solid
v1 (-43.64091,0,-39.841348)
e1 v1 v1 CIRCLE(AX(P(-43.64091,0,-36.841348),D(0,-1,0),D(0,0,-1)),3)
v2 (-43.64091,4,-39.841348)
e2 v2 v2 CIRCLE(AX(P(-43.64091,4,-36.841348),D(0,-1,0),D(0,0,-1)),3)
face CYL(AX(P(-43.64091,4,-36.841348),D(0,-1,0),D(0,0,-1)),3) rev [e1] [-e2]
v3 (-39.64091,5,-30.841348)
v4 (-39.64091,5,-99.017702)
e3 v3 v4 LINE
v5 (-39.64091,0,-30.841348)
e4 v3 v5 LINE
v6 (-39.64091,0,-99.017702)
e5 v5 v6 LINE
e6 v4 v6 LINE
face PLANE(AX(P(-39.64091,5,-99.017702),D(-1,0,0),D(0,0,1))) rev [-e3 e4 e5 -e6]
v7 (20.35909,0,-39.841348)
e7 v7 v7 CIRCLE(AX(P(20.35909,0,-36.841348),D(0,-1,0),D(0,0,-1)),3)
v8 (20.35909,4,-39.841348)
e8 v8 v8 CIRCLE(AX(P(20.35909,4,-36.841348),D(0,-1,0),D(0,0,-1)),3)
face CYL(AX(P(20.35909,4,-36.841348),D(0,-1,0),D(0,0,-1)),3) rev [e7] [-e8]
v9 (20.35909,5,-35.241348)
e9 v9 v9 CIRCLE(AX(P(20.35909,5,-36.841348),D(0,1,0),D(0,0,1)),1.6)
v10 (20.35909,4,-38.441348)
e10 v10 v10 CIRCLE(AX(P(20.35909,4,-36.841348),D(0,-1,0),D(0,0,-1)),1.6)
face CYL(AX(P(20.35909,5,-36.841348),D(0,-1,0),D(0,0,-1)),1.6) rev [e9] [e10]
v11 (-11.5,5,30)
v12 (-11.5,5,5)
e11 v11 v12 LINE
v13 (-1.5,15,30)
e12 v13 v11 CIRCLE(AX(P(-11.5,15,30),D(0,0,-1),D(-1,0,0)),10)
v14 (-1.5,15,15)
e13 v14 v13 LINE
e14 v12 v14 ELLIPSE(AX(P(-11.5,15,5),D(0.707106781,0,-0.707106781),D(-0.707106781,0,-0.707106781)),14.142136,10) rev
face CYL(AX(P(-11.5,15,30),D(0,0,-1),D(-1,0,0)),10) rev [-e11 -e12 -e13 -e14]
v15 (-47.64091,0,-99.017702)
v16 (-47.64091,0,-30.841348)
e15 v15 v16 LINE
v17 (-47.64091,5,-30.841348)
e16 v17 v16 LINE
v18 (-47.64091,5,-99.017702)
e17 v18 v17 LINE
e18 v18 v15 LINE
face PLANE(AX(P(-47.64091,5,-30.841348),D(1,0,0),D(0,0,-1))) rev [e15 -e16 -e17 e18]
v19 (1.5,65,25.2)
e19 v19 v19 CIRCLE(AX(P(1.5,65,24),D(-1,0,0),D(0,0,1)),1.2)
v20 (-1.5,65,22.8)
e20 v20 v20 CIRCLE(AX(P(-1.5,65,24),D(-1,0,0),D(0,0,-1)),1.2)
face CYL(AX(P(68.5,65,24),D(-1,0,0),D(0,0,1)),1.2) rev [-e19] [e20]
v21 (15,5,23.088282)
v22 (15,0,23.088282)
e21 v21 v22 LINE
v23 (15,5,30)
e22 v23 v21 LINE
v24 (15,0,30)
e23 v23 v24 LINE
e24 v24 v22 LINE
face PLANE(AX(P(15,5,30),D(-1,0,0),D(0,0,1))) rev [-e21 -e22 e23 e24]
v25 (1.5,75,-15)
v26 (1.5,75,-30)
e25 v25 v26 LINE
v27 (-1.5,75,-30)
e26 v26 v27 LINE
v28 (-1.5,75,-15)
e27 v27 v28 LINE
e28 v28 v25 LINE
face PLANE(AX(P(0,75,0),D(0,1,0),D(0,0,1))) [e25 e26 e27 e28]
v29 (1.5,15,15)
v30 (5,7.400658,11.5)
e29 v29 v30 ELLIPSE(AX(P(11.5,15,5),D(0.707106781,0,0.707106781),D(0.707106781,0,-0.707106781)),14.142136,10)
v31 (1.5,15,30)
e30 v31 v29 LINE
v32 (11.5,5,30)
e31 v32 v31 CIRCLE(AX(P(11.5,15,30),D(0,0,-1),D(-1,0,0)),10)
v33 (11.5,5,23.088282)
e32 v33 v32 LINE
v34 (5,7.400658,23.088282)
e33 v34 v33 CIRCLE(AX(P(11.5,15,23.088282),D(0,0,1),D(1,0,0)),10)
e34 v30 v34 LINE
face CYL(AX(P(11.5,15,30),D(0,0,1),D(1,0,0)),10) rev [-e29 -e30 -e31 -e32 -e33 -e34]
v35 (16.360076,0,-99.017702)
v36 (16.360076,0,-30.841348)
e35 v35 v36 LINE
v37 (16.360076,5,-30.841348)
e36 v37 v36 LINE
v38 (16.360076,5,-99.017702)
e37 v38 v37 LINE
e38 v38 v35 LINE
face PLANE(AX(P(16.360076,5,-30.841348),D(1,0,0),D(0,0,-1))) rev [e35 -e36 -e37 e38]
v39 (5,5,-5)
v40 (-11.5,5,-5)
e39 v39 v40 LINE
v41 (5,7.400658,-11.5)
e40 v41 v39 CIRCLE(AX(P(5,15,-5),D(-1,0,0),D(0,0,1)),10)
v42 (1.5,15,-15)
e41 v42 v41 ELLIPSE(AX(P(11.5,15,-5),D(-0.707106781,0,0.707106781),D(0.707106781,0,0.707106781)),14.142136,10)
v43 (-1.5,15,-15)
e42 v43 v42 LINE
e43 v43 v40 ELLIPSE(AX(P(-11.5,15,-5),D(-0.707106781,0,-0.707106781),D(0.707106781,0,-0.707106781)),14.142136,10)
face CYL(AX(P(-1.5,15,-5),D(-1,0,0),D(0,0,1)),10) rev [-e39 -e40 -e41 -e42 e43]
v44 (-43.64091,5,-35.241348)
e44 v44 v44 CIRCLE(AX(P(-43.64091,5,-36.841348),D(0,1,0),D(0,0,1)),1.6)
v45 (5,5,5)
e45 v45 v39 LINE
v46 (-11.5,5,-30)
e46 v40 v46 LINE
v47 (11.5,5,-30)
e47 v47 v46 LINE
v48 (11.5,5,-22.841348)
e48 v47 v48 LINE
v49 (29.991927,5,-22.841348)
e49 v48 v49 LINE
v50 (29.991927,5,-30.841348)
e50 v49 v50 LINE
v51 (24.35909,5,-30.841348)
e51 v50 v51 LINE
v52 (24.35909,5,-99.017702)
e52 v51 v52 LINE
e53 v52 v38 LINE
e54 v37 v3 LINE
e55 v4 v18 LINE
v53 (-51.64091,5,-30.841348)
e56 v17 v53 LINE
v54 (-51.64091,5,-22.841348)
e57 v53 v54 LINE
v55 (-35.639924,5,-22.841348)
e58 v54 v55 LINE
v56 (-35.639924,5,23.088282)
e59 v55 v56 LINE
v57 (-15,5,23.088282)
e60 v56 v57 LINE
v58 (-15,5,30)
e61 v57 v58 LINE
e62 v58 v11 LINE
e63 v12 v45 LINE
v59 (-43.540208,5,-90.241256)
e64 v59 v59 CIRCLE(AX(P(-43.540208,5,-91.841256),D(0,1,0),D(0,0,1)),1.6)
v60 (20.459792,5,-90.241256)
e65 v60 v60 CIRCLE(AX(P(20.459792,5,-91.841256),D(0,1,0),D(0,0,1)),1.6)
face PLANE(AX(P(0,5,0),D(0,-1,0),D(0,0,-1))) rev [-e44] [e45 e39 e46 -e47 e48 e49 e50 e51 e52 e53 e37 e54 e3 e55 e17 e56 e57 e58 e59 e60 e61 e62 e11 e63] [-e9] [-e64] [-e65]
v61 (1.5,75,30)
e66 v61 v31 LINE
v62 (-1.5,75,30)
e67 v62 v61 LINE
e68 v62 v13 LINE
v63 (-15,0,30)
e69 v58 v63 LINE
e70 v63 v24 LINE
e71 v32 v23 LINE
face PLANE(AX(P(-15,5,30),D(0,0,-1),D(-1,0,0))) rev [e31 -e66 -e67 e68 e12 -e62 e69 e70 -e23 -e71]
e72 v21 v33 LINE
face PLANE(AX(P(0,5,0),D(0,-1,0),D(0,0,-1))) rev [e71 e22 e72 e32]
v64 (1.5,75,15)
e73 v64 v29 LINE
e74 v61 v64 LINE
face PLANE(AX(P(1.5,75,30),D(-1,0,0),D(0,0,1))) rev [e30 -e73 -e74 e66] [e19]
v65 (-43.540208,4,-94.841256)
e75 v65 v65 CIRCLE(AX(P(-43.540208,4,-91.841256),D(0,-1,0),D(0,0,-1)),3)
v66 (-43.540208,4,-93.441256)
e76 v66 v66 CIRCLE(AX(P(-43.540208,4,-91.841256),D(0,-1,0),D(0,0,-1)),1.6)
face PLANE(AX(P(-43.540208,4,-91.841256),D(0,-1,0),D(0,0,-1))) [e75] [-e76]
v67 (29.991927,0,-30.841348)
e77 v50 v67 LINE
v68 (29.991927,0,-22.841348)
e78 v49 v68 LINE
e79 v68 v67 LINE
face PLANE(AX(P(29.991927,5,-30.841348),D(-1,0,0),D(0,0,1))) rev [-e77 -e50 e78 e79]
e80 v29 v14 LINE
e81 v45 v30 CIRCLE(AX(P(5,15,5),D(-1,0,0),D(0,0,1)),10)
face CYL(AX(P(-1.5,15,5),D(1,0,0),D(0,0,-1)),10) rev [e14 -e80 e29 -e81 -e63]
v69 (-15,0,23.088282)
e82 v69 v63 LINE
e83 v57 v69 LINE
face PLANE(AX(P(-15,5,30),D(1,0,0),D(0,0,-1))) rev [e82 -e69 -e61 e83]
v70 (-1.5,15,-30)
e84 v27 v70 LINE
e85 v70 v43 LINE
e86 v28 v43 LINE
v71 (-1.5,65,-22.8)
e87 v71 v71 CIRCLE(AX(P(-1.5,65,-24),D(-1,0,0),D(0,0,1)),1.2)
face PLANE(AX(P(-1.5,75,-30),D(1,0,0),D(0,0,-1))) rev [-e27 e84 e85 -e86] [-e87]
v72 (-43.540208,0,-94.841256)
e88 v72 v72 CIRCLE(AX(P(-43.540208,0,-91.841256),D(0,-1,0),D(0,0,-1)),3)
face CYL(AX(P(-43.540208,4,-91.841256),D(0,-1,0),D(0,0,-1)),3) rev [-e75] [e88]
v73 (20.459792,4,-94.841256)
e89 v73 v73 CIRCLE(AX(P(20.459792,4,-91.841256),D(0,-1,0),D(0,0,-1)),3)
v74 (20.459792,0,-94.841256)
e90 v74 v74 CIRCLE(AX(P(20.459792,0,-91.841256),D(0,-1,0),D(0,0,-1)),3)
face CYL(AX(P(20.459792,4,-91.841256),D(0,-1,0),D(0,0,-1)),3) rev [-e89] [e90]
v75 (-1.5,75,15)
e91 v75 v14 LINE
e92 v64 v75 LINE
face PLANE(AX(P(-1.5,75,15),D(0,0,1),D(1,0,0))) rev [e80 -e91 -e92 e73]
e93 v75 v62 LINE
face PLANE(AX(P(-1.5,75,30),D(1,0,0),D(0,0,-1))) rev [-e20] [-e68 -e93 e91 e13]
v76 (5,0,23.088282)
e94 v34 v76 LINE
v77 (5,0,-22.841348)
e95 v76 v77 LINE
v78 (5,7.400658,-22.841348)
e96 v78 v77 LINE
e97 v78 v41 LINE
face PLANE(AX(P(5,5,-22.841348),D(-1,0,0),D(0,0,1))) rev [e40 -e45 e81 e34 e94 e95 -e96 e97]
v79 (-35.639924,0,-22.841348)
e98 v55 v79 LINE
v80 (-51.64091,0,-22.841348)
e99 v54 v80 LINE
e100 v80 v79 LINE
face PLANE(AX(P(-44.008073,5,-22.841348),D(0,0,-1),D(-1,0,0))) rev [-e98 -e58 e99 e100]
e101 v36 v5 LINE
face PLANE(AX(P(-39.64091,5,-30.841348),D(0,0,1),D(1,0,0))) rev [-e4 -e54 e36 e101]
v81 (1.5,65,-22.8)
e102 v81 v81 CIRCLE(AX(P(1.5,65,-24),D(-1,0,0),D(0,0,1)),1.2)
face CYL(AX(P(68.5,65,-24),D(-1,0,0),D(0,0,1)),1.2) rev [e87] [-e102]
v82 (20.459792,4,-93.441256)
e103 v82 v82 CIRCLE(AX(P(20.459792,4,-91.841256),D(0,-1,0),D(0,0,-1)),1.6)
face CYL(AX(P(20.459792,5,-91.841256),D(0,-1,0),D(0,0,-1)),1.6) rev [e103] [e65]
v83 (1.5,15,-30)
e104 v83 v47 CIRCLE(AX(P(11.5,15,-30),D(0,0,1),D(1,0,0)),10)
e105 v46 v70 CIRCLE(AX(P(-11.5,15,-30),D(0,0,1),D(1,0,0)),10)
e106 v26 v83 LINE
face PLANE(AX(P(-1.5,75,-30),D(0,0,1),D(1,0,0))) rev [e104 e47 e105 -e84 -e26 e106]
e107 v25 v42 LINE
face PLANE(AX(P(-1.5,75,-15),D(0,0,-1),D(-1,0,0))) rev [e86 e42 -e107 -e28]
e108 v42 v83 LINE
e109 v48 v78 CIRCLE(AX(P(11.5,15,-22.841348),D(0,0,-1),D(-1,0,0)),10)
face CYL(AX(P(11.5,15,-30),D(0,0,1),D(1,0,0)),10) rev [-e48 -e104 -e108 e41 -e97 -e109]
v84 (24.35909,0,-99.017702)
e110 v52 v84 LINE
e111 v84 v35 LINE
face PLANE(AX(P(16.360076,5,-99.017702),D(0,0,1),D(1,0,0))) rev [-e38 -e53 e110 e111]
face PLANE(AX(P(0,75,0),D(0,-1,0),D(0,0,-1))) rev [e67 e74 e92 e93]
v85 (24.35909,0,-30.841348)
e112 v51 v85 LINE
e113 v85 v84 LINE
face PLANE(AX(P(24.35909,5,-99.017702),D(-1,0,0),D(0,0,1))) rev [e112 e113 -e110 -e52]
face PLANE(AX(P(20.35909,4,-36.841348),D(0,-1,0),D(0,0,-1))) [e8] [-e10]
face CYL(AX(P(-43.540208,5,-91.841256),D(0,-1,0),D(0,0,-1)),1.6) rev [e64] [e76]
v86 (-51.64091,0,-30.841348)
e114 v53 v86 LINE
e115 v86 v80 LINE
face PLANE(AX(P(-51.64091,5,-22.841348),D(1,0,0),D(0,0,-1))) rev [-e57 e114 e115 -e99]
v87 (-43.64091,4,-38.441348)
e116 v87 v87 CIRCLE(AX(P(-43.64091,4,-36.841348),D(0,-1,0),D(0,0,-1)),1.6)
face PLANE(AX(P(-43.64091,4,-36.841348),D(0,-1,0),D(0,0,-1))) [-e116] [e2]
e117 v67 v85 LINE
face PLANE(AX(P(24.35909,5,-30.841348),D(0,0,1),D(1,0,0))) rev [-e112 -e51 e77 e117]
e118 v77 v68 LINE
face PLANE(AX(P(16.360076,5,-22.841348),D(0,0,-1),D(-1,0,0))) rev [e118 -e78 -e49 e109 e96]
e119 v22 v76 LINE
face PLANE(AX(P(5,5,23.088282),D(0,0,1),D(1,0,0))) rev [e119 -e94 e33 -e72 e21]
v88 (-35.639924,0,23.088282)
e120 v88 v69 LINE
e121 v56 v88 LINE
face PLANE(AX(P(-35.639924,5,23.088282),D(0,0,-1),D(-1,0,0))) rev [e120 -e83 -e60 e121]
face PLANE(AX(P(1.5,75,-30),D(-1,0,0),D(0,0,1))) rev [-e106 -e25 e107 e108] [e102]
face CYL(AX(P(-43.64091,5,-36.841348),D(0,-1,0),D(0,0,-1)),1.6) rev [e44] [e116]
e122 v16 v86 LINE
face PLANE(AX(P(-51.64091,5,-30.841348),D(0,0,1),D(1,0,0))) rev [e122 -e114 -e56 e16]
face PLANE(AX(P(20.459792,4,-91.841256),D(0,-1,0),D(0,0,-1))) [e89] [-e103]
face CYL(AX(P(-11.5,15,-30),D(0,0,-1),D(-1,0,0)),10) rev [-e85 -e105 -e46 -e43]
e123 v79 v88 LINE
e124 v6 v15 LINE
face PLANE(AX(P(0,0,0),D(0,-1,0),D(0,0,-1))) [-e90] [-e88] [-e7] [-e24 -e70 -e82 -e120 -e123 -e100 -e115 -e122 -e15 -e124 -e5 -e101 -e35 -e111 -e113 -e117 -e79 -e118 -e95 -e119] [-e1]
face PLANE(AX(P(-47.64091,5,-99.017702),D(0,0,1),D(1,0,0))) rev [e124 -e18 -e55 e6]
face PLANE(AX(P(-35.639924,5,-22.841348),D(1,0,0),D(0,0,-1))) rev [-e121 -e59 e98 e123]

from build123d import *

# Parameters (mm, degrees)
SKETCH1_R           = 1.6
BOSS_EXTRUDE1_DEPTH = 5
SKETCH5_R           = 3
CUT_EXTRUDE6_DEPTH  = 4
SKETCH2_W           = 3
SKETCH2_H           = 15
BOSS_EXTRUDE2_DEPTH = 70
SKETCH3_R           = 1.2
CUT_EXTRUDE1_DEPTH  = 70
FILLET1_R           = 10


with BuildPart() as part:
    # Sketch1 → Boss-Extrude1 (new body)
    with BuildSketch(Plane(origin=(0, 0, 0), x_dir=(1, 0, 0), z_dir=(0, 1, 0))):
        Polygon((5, 22.84134835), (16.360076307, 22.84134835), (29.991927163, 22.84134835), (29.991927163, 30.010026716), (29.991927163, 30.84134835), (24.359090043, 30.84134835), (24.359090043, 92.100281359), (24.359090043, 99.017701748), (16.360076307, 99.017701748), (16.360076307, 92.100281359), (16.360076307, 30.84134835), (-39.640909957, 30.84134835), (-39.640909957, 88.100281359), (-39.640909957, 99.017701748), (-47.640909957, 99.017701748), (-47.640909957, 88.100281359), (-47.640909957, 30.84134835), (-51.640909957, 30.84134835), (-51.640909957, 22.84134835), (-44.008072837, 22.84134835), (-35.639923693, 22.84134835), (-35.639923693, -23.088281846), (-15, -23.088281846), (-15, -30), (15, -30), (15, -23.088281846), (5, -23.088281846), align=None)
        with Locations(Location((-43.540208284, 91.841256161, 0), (0, 0, 270))):
            Circle(SKETCH1_R, mode=Mode.SUBTRACT)
        with Locations(Location((20.459791716, 91.841256161, 0), (0, 0, 270))):
            Circle(SKETCH1_R, mode=Mode.SUBTRACT)
        with Locations(Location((-43.640909957, 36.84134835, 0), (0, 0, 270))):
            Circle(SKETCH1_R, mode=Mode.SUBTRACT)
        with Locations(Location((20.359090043, 36.84134835, 0), (0, 0, 270))):
            Circle(SKETCH1_R, mode=Mode.SUBTRACT)
    extrude(amount=BOSS_EXTRUDE1_DEPTH)

    # Sketch5 → Cut-Extrude6 (cut)
    with BuildSketch(Plane.XZ):
        with Locations(Location((20.459791716, -91.841256161, 0), (0, 0, 270))):
            Circle(SKETCH5_R)
        with Locations(Location((20.359090043, -36.84134835, 0), (0, 0, 270))):
            Circle(SKETCH5_R)
        with Locations(Location((-43.540208284, -91.841256161, 0), (0, 0, 270))):
            Circle(SKETCH5_R)
        with Locations(Location((-43.640909957, -36.84134835, 0), (0, 0, 270))):
            Circle(SKETCH5_R)
    extrude(amount=-CUT_EXTRUDE6_DEPTH, mode=Mode.SUBTRACT)

    # Sketch2 → Boss-Extrude2 (add)
    with BuildSketch(Plane(origin=(0, 5, 0), x_dir=(1, 0, 0), z_dir=(0, 1, 0))):
        with Locations((0, -22.5)):
            Rectangle(SKETCH2_W, SKETCH2_H)
        with Locations((0, 22.5)):
            Rectangle(SKETCH2_W, SKETCH2_H)
    extrude(amount=BOSS_EXTRUDE2_DEPTH)

    # Sketch3 → Cut-Extrude1 (cut)
    with BuildSketch(Plane.ZY.offset(1.5)):
        with Locations((-24, 65)):
            Circle(SKETCH3_R)
        with Locations((24, 65)):
            Circle(SKETCH3_R)
    extrude(amount=-CUT_EXTRUDE1_DEPTH, mode=Mode.SUBTRACT)

    # Fillet1
    # the kernel refuses this fillet: 10 mm, written as the material it adds along each edge
    with BuildSketch(Plane(origin=(-1.5, 5, 15), x_dir=(-1, 0, 0), z_dir=(0, 0, 1)), Plane(origin=(-1.5, 5, -30), x_dir=(-1, 0, 0), z_dir=(0, 0, 1))) as fillet1_piece_1:
        with BuildLine():
            CenterArc((FILLET1_R, -FILLET1_R), FILLET1_R, 90, 90)
            Line((0, -FILLET1_R), (0, 0))
            Line((0, 0), (FILLET1_R, 0))
        make_face()
    extrude(amount=15)
    with BuildSketch(Plane(origin=(1.5, 5, 30), x_dir=(1, 0, 0), z_dir=(0, 0, -1))) as fillet1_piece_2_section:
        with BuildLine():
            CenterArc((FILLET1_R, -FILLET1_R), FILLET1_R, 90, 90)
            Line((0, -FILLET1_R), (0, 0))
            Line((0, 0), (FILLET1_R, 0))
        make_face()
    fillet1_piece_2 = extrude(amount=40, mode=Mode.PRIVATE)
    fillet1_piece_2 = split(fillet1_piece_2, bisect_by=Plane(origin=(1.5, 5, 23.088281846), z_dir=(0, 0, 1)), keep=Keep.TOP, mode=Mode.PRIVATE)
    add(fillet1_piece_2)
    with BuildSketch(Plane(origin=(1.5, 5, 30), x_dir=(1, 0, 0), z_dir=(0, 0, -1))) as fillet1_piece_3_section:
        with BuildLine():
            CenterArc((FILLET1_R, -FILLET1_R), FILLET1_R, 90, 90)
            Line((0, -FILLET1_R), (0, 0))
            Line((0, 0), (FILLET1_R, 0))
        make_face()
    fillet1_piece_3 = extrude(amount=15, mode=Mode.PRIVATE)
    fillet1_piece_3 = split(fillet1_piece_3, bisect_by=Plane(origin=(5, 5, 30), z_dir=(-1, 0, 0)), keep=Keep.TOP, mode=Mode.PRIVATE)
    add(fillet1_piece_3)
    with BuildSketch(Plane(origin=(1.5, 5, 15), x_dir=(0, 0, -1), z_dir=(-1, 0, 0)), Plane(origin=(-1.5, 5, -15), x_dir=(0, 0, 1), z_dir=(1, 0, 0))) as fillet1_piece_4:
        with BuildLine():
            CenterArc((FILLET1_R, -FILLET1_R), FILLET1_R, 90, 90)
            Line((0, -FILLET1_R), (0, 0))
            Line((0, 0), (FILLET1_R, 0))
        make_face()
    extrude(amount=3)
    with BuildSketch(Plane(origin=(1.5, 5, -15), x_dir=(1, 0, 0), z_dir=(0, 0, -1))) as fillet1_piece_5_section:
        with BuildLine():
            CenterArc((FILLET1_R, -FILLET1_R), FILLET1_R, 90, 90)
            Line((0, -FILLET1_R), (0, 0))
            Line((0, 0), (FILLET1_R, 0))
        make_face()
    fillet1_piece_5 = extrude(amount=15, mode=Mode.PRIVATE)
    fillet1_piece_5 = split(fillet1_piece_5, bisect_by=Plane(origin=(5, 5, -15), z_dir=(-1, 0, 0)), keep=Keep.TOP, mode=Mode.PRIVATE)
    add(fillet1_piece_5)
    with BuildSketch(Plane(origin=(1.5, 5, 10), x_dir=(1, 0, 0), z_dir=(0, 0, -1))) as fillet1_piece_6_section:
        with BuildLine():
            CenterArc((FILLET1_R, -FILLET1_R), FILLET1_R, 90, 90)
            Line((0, -FILLET1_R), (0, 0))
            Line((0, 0), (FILLET1_R, 0))
        make_face()
    fillet1_piece_6 = extrude(amount=40, mode=Mode.PRIVATE)
    fillet1_piece_6 = split(fillet1_piece_6, bisect_by=Plane(origin=(1.5, 5, -22.84134835), z_dir=(0, 0, -1)), keep=Keep.TOP, mode=Mode.PRIVATE)
    add(fillet1_piece_6)
    with BuildSketch(Plane(origin=(1.5, 5, 15), x_dir=(0, 0, -1), z_dir=(-1, 0, 0))) as fillet1_piece_7a_section:
        with BuildLine():
            CenterArc((FILLET1_R, -FILLET1_R), FILLET1_R, 90, 90)
            Line((0, -FILLET1_R), (0, 0))
            Line((0, 0), (FILLET1_R, 0))
        make_face()
    fillet1_piece_7a = extrude(amount=28, mode=Mode.PRIVATE)
    fillet1_piece_7a = split(fillet1_piece_7a, bisect_by=Plane(origin=(-1.5, 5, 15), z_dir=(-1, 0, 0)), keep=Keep.TOP, mode=Mode.PRIVATE)
    with BuildSketch(Plane(origin=(-1.5, 5, -10), x_dir=(-1, 0, 0), z_dir=(0, 0, 1))) as fillet1_piece_7b_section:
        with BuildLine():
            CenterArc((FILLET1_R, -FILLET1_R), FILLET1_R, 90, 90)
            Line((0, -FILLET1_R), (0, 0))
            Line((0, 0), (FILLET1_R, 0))
        make_face()
    fillet1_piece_7b = extrude(amount=40, mode=Mode.PRIVATE)
    fillet1_piece_7b = split(fillet1_piece_7b, bisect_by=Plane(origin=(-1.5, 5, 15), z_dir=(0, 0, -1)), keep=Keep.TOP, mode=Mode.PRIVATE)
    fillet1_piece_7 = fillet1_piece_7a & fillet1_piece_7b
    add(fillet1_piece_7)
    with BuildSketch(Plane(origin=(1.5, 5, 30), x_dir=(1, 0, 0), z_dir=(0, 0, -1))) as fillet1_piece_8a_section:
        with BuildLine():
            CenterArc((FILLET1_R, -FILLET1_R), FILLET1_R, 90, 90)
            Line((0, -FILLET1_R), (0, 0))
            Line((0, 0), (FILLET1_R, 0))
        make_face()
    fillet1_piece_8a = extrude(amount=40, mode=Mode.PRIVATE)
    fillet1_piece_8a = split(fillet1_piece_8a, bisect_by=Plane(origin=(5, 5, 30), z_dir=(-1, 0, 0)), keep=Keep.TOP, mode=Mode.PRIVATE)
    fillet1_piece_8a = split(fillet1_piece_8a, bisect_by=Plane(origin=(1.5, 5, 15), z_dir=(0, 0, -1)), keep=Keep.TOP, mode=Mode.PRIVATE)
    with BuildSketch(Plane(origin=(26.5, 5, 15), x_dir=(0, 0, -1), z_dir=(-1, 0, 0))) as fillet1_piece_8b_section:
        with BuildLine():
            CenterArc((FILLET1_R, -FILLET1_R), FILLET1_R, 90, 90)
            Line((0, -FILLET1_R), (0, 0))
            Line((0, 0), (FILLET1_R, 0))
        make_face()
    fillet1_piece_8b = extrude(amount=28, mode=Mode.PRIVATE)
    fillet1_piece_8b = split(fillet1_piece_8b, bisect_by=Plane(origin=(5, 5, 15), z_dir=(-1, 0, 0)), keep=Keep.TOP, mode=Mode.PRIVATE)
    fillet1_piece_8b = split(fillet1_piece_8b, bisect_by=Plane(origin=(1.5, 5, 15), z_dir=(1, 0, 0)), keep=Keep.TOP, mode=Mode.PRIVATE)
    fillet1_piece_8 = fillet1_piece_8a & fillet1_piece_8b
    add(fillet1_piece_8)
    with BuildSketch(Plane(origin=(-26.5, 5, -15), x_dir=(0, 0, 1), z_dir=(1, 0, 0))) as fillet1_piece_9a_section:
        with BuildLine():
            CenterArc((FILLET1_R, -FILLET1_R), FILLET1_R, 90, 90)
            Line((0, -FILLET1_R), (0, 0))
            Line((0, 0), (FILLET1_R, 0))
        make_face()
    fillet1_piece_9a = extrude(amount=28, mode=Mode.PRIVATE)
    fillet1_piece_9a = split(fillet1_piece_9a, bisect_by=Plane(origin=(-1.5, 5, -15), z_dir=(-1, 0, 0)), keep=Keep.TOP, mode=Mode.PRIVATE)
    with BuildSketch(Plane(origin=(-1.5, 5, -30), x_dir=(-1, 0, 0), z_dir=(0, 0, 1))) as fillet1_piece_9b_section:
        with BuildLine():
            CenterArc((FILLET1_R, -FILLET1_R), FILLET1_R, 90, 90)
            Line((0, -FILLET1_R), (0, 0))
            Line((0, 0), (FILLET1_R, 0))
        make_face()
    fillet1_piece_9b = extrude(amount=40, mode=Mode.PRIVATE)
    fillet1_piece_9b = split(fillet1_piece_9b, bisect_by=Plane(origin=(-1.5, 5, -15), z_dir=(0, 0, 1)), keep=Keep.TOP, mode=Mode.PRIVATE)
    fillet1_piece_9 = fillet1_piece_9a & fillet1_piece_9b
    add(fillet1_piece_9)
    with BuildSketch(Plane(origin=(-1.5, 5, -15), x_dir=(0, 0, 1), z_dir=(1, 0, 0))) as fillet1_piece_10a_section:
        with BuildLine():
            CenterArc((FILLET1_R, -FILLET1_R), FILLET1_R, 90, 90)
            Line((0, -FILLET1_R), (0, 0))
            Line((0, 0), (FILLET1_R, 0))
        make_face()
    fillet1_piece_10a = extrude(amount=28, mode=Mode.PRIVATE)
    fillet1_piece_10a = split(fillet1_piece_10a, bisect_by=Plane(origin=(5, 5, -15), z_dir=(-1, 0, 0)), keep=Keep.TOP, mode=Mode.PRIVATE)
    fillet1_piece_10a = split(fillet1_piece_10a, bisect_by=Plane(origin=(1.5, 5, -15), z_dir=(1, 0, 0)), keep=Keep.TOP, mode=Mode.PRIVATE)
    with BuildSketch(Plane(origin=(1.5, 5, 10), x_dir=(1, 0, 0), z_dir=(0, 0, -1))) as fillet1_piece_10b_section:
        with BuildLine():
            CenterArc((FILLET1_R, -FILLET1_R), FILLET1_R, 90, 90)
            Line((0, -FILLET1_R), (0, 0))
            Line((0, 0), (FILLET1_R, 0))
        make_face()
    fillet1_piece_10b = extrude(amount=40, mode=Mode.PRIVATE)
    fillet1_piece_10b = split(fillet1_piece_10b, bisect_by=Plane(origin=(5, 5, 10), z_dir=(-1, 0, 0)), keep=Keep.TOP, mode=Mode.PRIVATE)
    fillet1_piece_10b = split(fillet1_piece_10b, bisect_by=Plane(origin=(1.5, 5, -15), z_dir=(0, 0, 1)), keep=Keep.TOP, mode=Mode.PRIVATE)
    fillet1_piece_10 = fillet1_piece_10a & fillet1_piece_10b
    add(fillet1_piece_10)


solid = part.part
